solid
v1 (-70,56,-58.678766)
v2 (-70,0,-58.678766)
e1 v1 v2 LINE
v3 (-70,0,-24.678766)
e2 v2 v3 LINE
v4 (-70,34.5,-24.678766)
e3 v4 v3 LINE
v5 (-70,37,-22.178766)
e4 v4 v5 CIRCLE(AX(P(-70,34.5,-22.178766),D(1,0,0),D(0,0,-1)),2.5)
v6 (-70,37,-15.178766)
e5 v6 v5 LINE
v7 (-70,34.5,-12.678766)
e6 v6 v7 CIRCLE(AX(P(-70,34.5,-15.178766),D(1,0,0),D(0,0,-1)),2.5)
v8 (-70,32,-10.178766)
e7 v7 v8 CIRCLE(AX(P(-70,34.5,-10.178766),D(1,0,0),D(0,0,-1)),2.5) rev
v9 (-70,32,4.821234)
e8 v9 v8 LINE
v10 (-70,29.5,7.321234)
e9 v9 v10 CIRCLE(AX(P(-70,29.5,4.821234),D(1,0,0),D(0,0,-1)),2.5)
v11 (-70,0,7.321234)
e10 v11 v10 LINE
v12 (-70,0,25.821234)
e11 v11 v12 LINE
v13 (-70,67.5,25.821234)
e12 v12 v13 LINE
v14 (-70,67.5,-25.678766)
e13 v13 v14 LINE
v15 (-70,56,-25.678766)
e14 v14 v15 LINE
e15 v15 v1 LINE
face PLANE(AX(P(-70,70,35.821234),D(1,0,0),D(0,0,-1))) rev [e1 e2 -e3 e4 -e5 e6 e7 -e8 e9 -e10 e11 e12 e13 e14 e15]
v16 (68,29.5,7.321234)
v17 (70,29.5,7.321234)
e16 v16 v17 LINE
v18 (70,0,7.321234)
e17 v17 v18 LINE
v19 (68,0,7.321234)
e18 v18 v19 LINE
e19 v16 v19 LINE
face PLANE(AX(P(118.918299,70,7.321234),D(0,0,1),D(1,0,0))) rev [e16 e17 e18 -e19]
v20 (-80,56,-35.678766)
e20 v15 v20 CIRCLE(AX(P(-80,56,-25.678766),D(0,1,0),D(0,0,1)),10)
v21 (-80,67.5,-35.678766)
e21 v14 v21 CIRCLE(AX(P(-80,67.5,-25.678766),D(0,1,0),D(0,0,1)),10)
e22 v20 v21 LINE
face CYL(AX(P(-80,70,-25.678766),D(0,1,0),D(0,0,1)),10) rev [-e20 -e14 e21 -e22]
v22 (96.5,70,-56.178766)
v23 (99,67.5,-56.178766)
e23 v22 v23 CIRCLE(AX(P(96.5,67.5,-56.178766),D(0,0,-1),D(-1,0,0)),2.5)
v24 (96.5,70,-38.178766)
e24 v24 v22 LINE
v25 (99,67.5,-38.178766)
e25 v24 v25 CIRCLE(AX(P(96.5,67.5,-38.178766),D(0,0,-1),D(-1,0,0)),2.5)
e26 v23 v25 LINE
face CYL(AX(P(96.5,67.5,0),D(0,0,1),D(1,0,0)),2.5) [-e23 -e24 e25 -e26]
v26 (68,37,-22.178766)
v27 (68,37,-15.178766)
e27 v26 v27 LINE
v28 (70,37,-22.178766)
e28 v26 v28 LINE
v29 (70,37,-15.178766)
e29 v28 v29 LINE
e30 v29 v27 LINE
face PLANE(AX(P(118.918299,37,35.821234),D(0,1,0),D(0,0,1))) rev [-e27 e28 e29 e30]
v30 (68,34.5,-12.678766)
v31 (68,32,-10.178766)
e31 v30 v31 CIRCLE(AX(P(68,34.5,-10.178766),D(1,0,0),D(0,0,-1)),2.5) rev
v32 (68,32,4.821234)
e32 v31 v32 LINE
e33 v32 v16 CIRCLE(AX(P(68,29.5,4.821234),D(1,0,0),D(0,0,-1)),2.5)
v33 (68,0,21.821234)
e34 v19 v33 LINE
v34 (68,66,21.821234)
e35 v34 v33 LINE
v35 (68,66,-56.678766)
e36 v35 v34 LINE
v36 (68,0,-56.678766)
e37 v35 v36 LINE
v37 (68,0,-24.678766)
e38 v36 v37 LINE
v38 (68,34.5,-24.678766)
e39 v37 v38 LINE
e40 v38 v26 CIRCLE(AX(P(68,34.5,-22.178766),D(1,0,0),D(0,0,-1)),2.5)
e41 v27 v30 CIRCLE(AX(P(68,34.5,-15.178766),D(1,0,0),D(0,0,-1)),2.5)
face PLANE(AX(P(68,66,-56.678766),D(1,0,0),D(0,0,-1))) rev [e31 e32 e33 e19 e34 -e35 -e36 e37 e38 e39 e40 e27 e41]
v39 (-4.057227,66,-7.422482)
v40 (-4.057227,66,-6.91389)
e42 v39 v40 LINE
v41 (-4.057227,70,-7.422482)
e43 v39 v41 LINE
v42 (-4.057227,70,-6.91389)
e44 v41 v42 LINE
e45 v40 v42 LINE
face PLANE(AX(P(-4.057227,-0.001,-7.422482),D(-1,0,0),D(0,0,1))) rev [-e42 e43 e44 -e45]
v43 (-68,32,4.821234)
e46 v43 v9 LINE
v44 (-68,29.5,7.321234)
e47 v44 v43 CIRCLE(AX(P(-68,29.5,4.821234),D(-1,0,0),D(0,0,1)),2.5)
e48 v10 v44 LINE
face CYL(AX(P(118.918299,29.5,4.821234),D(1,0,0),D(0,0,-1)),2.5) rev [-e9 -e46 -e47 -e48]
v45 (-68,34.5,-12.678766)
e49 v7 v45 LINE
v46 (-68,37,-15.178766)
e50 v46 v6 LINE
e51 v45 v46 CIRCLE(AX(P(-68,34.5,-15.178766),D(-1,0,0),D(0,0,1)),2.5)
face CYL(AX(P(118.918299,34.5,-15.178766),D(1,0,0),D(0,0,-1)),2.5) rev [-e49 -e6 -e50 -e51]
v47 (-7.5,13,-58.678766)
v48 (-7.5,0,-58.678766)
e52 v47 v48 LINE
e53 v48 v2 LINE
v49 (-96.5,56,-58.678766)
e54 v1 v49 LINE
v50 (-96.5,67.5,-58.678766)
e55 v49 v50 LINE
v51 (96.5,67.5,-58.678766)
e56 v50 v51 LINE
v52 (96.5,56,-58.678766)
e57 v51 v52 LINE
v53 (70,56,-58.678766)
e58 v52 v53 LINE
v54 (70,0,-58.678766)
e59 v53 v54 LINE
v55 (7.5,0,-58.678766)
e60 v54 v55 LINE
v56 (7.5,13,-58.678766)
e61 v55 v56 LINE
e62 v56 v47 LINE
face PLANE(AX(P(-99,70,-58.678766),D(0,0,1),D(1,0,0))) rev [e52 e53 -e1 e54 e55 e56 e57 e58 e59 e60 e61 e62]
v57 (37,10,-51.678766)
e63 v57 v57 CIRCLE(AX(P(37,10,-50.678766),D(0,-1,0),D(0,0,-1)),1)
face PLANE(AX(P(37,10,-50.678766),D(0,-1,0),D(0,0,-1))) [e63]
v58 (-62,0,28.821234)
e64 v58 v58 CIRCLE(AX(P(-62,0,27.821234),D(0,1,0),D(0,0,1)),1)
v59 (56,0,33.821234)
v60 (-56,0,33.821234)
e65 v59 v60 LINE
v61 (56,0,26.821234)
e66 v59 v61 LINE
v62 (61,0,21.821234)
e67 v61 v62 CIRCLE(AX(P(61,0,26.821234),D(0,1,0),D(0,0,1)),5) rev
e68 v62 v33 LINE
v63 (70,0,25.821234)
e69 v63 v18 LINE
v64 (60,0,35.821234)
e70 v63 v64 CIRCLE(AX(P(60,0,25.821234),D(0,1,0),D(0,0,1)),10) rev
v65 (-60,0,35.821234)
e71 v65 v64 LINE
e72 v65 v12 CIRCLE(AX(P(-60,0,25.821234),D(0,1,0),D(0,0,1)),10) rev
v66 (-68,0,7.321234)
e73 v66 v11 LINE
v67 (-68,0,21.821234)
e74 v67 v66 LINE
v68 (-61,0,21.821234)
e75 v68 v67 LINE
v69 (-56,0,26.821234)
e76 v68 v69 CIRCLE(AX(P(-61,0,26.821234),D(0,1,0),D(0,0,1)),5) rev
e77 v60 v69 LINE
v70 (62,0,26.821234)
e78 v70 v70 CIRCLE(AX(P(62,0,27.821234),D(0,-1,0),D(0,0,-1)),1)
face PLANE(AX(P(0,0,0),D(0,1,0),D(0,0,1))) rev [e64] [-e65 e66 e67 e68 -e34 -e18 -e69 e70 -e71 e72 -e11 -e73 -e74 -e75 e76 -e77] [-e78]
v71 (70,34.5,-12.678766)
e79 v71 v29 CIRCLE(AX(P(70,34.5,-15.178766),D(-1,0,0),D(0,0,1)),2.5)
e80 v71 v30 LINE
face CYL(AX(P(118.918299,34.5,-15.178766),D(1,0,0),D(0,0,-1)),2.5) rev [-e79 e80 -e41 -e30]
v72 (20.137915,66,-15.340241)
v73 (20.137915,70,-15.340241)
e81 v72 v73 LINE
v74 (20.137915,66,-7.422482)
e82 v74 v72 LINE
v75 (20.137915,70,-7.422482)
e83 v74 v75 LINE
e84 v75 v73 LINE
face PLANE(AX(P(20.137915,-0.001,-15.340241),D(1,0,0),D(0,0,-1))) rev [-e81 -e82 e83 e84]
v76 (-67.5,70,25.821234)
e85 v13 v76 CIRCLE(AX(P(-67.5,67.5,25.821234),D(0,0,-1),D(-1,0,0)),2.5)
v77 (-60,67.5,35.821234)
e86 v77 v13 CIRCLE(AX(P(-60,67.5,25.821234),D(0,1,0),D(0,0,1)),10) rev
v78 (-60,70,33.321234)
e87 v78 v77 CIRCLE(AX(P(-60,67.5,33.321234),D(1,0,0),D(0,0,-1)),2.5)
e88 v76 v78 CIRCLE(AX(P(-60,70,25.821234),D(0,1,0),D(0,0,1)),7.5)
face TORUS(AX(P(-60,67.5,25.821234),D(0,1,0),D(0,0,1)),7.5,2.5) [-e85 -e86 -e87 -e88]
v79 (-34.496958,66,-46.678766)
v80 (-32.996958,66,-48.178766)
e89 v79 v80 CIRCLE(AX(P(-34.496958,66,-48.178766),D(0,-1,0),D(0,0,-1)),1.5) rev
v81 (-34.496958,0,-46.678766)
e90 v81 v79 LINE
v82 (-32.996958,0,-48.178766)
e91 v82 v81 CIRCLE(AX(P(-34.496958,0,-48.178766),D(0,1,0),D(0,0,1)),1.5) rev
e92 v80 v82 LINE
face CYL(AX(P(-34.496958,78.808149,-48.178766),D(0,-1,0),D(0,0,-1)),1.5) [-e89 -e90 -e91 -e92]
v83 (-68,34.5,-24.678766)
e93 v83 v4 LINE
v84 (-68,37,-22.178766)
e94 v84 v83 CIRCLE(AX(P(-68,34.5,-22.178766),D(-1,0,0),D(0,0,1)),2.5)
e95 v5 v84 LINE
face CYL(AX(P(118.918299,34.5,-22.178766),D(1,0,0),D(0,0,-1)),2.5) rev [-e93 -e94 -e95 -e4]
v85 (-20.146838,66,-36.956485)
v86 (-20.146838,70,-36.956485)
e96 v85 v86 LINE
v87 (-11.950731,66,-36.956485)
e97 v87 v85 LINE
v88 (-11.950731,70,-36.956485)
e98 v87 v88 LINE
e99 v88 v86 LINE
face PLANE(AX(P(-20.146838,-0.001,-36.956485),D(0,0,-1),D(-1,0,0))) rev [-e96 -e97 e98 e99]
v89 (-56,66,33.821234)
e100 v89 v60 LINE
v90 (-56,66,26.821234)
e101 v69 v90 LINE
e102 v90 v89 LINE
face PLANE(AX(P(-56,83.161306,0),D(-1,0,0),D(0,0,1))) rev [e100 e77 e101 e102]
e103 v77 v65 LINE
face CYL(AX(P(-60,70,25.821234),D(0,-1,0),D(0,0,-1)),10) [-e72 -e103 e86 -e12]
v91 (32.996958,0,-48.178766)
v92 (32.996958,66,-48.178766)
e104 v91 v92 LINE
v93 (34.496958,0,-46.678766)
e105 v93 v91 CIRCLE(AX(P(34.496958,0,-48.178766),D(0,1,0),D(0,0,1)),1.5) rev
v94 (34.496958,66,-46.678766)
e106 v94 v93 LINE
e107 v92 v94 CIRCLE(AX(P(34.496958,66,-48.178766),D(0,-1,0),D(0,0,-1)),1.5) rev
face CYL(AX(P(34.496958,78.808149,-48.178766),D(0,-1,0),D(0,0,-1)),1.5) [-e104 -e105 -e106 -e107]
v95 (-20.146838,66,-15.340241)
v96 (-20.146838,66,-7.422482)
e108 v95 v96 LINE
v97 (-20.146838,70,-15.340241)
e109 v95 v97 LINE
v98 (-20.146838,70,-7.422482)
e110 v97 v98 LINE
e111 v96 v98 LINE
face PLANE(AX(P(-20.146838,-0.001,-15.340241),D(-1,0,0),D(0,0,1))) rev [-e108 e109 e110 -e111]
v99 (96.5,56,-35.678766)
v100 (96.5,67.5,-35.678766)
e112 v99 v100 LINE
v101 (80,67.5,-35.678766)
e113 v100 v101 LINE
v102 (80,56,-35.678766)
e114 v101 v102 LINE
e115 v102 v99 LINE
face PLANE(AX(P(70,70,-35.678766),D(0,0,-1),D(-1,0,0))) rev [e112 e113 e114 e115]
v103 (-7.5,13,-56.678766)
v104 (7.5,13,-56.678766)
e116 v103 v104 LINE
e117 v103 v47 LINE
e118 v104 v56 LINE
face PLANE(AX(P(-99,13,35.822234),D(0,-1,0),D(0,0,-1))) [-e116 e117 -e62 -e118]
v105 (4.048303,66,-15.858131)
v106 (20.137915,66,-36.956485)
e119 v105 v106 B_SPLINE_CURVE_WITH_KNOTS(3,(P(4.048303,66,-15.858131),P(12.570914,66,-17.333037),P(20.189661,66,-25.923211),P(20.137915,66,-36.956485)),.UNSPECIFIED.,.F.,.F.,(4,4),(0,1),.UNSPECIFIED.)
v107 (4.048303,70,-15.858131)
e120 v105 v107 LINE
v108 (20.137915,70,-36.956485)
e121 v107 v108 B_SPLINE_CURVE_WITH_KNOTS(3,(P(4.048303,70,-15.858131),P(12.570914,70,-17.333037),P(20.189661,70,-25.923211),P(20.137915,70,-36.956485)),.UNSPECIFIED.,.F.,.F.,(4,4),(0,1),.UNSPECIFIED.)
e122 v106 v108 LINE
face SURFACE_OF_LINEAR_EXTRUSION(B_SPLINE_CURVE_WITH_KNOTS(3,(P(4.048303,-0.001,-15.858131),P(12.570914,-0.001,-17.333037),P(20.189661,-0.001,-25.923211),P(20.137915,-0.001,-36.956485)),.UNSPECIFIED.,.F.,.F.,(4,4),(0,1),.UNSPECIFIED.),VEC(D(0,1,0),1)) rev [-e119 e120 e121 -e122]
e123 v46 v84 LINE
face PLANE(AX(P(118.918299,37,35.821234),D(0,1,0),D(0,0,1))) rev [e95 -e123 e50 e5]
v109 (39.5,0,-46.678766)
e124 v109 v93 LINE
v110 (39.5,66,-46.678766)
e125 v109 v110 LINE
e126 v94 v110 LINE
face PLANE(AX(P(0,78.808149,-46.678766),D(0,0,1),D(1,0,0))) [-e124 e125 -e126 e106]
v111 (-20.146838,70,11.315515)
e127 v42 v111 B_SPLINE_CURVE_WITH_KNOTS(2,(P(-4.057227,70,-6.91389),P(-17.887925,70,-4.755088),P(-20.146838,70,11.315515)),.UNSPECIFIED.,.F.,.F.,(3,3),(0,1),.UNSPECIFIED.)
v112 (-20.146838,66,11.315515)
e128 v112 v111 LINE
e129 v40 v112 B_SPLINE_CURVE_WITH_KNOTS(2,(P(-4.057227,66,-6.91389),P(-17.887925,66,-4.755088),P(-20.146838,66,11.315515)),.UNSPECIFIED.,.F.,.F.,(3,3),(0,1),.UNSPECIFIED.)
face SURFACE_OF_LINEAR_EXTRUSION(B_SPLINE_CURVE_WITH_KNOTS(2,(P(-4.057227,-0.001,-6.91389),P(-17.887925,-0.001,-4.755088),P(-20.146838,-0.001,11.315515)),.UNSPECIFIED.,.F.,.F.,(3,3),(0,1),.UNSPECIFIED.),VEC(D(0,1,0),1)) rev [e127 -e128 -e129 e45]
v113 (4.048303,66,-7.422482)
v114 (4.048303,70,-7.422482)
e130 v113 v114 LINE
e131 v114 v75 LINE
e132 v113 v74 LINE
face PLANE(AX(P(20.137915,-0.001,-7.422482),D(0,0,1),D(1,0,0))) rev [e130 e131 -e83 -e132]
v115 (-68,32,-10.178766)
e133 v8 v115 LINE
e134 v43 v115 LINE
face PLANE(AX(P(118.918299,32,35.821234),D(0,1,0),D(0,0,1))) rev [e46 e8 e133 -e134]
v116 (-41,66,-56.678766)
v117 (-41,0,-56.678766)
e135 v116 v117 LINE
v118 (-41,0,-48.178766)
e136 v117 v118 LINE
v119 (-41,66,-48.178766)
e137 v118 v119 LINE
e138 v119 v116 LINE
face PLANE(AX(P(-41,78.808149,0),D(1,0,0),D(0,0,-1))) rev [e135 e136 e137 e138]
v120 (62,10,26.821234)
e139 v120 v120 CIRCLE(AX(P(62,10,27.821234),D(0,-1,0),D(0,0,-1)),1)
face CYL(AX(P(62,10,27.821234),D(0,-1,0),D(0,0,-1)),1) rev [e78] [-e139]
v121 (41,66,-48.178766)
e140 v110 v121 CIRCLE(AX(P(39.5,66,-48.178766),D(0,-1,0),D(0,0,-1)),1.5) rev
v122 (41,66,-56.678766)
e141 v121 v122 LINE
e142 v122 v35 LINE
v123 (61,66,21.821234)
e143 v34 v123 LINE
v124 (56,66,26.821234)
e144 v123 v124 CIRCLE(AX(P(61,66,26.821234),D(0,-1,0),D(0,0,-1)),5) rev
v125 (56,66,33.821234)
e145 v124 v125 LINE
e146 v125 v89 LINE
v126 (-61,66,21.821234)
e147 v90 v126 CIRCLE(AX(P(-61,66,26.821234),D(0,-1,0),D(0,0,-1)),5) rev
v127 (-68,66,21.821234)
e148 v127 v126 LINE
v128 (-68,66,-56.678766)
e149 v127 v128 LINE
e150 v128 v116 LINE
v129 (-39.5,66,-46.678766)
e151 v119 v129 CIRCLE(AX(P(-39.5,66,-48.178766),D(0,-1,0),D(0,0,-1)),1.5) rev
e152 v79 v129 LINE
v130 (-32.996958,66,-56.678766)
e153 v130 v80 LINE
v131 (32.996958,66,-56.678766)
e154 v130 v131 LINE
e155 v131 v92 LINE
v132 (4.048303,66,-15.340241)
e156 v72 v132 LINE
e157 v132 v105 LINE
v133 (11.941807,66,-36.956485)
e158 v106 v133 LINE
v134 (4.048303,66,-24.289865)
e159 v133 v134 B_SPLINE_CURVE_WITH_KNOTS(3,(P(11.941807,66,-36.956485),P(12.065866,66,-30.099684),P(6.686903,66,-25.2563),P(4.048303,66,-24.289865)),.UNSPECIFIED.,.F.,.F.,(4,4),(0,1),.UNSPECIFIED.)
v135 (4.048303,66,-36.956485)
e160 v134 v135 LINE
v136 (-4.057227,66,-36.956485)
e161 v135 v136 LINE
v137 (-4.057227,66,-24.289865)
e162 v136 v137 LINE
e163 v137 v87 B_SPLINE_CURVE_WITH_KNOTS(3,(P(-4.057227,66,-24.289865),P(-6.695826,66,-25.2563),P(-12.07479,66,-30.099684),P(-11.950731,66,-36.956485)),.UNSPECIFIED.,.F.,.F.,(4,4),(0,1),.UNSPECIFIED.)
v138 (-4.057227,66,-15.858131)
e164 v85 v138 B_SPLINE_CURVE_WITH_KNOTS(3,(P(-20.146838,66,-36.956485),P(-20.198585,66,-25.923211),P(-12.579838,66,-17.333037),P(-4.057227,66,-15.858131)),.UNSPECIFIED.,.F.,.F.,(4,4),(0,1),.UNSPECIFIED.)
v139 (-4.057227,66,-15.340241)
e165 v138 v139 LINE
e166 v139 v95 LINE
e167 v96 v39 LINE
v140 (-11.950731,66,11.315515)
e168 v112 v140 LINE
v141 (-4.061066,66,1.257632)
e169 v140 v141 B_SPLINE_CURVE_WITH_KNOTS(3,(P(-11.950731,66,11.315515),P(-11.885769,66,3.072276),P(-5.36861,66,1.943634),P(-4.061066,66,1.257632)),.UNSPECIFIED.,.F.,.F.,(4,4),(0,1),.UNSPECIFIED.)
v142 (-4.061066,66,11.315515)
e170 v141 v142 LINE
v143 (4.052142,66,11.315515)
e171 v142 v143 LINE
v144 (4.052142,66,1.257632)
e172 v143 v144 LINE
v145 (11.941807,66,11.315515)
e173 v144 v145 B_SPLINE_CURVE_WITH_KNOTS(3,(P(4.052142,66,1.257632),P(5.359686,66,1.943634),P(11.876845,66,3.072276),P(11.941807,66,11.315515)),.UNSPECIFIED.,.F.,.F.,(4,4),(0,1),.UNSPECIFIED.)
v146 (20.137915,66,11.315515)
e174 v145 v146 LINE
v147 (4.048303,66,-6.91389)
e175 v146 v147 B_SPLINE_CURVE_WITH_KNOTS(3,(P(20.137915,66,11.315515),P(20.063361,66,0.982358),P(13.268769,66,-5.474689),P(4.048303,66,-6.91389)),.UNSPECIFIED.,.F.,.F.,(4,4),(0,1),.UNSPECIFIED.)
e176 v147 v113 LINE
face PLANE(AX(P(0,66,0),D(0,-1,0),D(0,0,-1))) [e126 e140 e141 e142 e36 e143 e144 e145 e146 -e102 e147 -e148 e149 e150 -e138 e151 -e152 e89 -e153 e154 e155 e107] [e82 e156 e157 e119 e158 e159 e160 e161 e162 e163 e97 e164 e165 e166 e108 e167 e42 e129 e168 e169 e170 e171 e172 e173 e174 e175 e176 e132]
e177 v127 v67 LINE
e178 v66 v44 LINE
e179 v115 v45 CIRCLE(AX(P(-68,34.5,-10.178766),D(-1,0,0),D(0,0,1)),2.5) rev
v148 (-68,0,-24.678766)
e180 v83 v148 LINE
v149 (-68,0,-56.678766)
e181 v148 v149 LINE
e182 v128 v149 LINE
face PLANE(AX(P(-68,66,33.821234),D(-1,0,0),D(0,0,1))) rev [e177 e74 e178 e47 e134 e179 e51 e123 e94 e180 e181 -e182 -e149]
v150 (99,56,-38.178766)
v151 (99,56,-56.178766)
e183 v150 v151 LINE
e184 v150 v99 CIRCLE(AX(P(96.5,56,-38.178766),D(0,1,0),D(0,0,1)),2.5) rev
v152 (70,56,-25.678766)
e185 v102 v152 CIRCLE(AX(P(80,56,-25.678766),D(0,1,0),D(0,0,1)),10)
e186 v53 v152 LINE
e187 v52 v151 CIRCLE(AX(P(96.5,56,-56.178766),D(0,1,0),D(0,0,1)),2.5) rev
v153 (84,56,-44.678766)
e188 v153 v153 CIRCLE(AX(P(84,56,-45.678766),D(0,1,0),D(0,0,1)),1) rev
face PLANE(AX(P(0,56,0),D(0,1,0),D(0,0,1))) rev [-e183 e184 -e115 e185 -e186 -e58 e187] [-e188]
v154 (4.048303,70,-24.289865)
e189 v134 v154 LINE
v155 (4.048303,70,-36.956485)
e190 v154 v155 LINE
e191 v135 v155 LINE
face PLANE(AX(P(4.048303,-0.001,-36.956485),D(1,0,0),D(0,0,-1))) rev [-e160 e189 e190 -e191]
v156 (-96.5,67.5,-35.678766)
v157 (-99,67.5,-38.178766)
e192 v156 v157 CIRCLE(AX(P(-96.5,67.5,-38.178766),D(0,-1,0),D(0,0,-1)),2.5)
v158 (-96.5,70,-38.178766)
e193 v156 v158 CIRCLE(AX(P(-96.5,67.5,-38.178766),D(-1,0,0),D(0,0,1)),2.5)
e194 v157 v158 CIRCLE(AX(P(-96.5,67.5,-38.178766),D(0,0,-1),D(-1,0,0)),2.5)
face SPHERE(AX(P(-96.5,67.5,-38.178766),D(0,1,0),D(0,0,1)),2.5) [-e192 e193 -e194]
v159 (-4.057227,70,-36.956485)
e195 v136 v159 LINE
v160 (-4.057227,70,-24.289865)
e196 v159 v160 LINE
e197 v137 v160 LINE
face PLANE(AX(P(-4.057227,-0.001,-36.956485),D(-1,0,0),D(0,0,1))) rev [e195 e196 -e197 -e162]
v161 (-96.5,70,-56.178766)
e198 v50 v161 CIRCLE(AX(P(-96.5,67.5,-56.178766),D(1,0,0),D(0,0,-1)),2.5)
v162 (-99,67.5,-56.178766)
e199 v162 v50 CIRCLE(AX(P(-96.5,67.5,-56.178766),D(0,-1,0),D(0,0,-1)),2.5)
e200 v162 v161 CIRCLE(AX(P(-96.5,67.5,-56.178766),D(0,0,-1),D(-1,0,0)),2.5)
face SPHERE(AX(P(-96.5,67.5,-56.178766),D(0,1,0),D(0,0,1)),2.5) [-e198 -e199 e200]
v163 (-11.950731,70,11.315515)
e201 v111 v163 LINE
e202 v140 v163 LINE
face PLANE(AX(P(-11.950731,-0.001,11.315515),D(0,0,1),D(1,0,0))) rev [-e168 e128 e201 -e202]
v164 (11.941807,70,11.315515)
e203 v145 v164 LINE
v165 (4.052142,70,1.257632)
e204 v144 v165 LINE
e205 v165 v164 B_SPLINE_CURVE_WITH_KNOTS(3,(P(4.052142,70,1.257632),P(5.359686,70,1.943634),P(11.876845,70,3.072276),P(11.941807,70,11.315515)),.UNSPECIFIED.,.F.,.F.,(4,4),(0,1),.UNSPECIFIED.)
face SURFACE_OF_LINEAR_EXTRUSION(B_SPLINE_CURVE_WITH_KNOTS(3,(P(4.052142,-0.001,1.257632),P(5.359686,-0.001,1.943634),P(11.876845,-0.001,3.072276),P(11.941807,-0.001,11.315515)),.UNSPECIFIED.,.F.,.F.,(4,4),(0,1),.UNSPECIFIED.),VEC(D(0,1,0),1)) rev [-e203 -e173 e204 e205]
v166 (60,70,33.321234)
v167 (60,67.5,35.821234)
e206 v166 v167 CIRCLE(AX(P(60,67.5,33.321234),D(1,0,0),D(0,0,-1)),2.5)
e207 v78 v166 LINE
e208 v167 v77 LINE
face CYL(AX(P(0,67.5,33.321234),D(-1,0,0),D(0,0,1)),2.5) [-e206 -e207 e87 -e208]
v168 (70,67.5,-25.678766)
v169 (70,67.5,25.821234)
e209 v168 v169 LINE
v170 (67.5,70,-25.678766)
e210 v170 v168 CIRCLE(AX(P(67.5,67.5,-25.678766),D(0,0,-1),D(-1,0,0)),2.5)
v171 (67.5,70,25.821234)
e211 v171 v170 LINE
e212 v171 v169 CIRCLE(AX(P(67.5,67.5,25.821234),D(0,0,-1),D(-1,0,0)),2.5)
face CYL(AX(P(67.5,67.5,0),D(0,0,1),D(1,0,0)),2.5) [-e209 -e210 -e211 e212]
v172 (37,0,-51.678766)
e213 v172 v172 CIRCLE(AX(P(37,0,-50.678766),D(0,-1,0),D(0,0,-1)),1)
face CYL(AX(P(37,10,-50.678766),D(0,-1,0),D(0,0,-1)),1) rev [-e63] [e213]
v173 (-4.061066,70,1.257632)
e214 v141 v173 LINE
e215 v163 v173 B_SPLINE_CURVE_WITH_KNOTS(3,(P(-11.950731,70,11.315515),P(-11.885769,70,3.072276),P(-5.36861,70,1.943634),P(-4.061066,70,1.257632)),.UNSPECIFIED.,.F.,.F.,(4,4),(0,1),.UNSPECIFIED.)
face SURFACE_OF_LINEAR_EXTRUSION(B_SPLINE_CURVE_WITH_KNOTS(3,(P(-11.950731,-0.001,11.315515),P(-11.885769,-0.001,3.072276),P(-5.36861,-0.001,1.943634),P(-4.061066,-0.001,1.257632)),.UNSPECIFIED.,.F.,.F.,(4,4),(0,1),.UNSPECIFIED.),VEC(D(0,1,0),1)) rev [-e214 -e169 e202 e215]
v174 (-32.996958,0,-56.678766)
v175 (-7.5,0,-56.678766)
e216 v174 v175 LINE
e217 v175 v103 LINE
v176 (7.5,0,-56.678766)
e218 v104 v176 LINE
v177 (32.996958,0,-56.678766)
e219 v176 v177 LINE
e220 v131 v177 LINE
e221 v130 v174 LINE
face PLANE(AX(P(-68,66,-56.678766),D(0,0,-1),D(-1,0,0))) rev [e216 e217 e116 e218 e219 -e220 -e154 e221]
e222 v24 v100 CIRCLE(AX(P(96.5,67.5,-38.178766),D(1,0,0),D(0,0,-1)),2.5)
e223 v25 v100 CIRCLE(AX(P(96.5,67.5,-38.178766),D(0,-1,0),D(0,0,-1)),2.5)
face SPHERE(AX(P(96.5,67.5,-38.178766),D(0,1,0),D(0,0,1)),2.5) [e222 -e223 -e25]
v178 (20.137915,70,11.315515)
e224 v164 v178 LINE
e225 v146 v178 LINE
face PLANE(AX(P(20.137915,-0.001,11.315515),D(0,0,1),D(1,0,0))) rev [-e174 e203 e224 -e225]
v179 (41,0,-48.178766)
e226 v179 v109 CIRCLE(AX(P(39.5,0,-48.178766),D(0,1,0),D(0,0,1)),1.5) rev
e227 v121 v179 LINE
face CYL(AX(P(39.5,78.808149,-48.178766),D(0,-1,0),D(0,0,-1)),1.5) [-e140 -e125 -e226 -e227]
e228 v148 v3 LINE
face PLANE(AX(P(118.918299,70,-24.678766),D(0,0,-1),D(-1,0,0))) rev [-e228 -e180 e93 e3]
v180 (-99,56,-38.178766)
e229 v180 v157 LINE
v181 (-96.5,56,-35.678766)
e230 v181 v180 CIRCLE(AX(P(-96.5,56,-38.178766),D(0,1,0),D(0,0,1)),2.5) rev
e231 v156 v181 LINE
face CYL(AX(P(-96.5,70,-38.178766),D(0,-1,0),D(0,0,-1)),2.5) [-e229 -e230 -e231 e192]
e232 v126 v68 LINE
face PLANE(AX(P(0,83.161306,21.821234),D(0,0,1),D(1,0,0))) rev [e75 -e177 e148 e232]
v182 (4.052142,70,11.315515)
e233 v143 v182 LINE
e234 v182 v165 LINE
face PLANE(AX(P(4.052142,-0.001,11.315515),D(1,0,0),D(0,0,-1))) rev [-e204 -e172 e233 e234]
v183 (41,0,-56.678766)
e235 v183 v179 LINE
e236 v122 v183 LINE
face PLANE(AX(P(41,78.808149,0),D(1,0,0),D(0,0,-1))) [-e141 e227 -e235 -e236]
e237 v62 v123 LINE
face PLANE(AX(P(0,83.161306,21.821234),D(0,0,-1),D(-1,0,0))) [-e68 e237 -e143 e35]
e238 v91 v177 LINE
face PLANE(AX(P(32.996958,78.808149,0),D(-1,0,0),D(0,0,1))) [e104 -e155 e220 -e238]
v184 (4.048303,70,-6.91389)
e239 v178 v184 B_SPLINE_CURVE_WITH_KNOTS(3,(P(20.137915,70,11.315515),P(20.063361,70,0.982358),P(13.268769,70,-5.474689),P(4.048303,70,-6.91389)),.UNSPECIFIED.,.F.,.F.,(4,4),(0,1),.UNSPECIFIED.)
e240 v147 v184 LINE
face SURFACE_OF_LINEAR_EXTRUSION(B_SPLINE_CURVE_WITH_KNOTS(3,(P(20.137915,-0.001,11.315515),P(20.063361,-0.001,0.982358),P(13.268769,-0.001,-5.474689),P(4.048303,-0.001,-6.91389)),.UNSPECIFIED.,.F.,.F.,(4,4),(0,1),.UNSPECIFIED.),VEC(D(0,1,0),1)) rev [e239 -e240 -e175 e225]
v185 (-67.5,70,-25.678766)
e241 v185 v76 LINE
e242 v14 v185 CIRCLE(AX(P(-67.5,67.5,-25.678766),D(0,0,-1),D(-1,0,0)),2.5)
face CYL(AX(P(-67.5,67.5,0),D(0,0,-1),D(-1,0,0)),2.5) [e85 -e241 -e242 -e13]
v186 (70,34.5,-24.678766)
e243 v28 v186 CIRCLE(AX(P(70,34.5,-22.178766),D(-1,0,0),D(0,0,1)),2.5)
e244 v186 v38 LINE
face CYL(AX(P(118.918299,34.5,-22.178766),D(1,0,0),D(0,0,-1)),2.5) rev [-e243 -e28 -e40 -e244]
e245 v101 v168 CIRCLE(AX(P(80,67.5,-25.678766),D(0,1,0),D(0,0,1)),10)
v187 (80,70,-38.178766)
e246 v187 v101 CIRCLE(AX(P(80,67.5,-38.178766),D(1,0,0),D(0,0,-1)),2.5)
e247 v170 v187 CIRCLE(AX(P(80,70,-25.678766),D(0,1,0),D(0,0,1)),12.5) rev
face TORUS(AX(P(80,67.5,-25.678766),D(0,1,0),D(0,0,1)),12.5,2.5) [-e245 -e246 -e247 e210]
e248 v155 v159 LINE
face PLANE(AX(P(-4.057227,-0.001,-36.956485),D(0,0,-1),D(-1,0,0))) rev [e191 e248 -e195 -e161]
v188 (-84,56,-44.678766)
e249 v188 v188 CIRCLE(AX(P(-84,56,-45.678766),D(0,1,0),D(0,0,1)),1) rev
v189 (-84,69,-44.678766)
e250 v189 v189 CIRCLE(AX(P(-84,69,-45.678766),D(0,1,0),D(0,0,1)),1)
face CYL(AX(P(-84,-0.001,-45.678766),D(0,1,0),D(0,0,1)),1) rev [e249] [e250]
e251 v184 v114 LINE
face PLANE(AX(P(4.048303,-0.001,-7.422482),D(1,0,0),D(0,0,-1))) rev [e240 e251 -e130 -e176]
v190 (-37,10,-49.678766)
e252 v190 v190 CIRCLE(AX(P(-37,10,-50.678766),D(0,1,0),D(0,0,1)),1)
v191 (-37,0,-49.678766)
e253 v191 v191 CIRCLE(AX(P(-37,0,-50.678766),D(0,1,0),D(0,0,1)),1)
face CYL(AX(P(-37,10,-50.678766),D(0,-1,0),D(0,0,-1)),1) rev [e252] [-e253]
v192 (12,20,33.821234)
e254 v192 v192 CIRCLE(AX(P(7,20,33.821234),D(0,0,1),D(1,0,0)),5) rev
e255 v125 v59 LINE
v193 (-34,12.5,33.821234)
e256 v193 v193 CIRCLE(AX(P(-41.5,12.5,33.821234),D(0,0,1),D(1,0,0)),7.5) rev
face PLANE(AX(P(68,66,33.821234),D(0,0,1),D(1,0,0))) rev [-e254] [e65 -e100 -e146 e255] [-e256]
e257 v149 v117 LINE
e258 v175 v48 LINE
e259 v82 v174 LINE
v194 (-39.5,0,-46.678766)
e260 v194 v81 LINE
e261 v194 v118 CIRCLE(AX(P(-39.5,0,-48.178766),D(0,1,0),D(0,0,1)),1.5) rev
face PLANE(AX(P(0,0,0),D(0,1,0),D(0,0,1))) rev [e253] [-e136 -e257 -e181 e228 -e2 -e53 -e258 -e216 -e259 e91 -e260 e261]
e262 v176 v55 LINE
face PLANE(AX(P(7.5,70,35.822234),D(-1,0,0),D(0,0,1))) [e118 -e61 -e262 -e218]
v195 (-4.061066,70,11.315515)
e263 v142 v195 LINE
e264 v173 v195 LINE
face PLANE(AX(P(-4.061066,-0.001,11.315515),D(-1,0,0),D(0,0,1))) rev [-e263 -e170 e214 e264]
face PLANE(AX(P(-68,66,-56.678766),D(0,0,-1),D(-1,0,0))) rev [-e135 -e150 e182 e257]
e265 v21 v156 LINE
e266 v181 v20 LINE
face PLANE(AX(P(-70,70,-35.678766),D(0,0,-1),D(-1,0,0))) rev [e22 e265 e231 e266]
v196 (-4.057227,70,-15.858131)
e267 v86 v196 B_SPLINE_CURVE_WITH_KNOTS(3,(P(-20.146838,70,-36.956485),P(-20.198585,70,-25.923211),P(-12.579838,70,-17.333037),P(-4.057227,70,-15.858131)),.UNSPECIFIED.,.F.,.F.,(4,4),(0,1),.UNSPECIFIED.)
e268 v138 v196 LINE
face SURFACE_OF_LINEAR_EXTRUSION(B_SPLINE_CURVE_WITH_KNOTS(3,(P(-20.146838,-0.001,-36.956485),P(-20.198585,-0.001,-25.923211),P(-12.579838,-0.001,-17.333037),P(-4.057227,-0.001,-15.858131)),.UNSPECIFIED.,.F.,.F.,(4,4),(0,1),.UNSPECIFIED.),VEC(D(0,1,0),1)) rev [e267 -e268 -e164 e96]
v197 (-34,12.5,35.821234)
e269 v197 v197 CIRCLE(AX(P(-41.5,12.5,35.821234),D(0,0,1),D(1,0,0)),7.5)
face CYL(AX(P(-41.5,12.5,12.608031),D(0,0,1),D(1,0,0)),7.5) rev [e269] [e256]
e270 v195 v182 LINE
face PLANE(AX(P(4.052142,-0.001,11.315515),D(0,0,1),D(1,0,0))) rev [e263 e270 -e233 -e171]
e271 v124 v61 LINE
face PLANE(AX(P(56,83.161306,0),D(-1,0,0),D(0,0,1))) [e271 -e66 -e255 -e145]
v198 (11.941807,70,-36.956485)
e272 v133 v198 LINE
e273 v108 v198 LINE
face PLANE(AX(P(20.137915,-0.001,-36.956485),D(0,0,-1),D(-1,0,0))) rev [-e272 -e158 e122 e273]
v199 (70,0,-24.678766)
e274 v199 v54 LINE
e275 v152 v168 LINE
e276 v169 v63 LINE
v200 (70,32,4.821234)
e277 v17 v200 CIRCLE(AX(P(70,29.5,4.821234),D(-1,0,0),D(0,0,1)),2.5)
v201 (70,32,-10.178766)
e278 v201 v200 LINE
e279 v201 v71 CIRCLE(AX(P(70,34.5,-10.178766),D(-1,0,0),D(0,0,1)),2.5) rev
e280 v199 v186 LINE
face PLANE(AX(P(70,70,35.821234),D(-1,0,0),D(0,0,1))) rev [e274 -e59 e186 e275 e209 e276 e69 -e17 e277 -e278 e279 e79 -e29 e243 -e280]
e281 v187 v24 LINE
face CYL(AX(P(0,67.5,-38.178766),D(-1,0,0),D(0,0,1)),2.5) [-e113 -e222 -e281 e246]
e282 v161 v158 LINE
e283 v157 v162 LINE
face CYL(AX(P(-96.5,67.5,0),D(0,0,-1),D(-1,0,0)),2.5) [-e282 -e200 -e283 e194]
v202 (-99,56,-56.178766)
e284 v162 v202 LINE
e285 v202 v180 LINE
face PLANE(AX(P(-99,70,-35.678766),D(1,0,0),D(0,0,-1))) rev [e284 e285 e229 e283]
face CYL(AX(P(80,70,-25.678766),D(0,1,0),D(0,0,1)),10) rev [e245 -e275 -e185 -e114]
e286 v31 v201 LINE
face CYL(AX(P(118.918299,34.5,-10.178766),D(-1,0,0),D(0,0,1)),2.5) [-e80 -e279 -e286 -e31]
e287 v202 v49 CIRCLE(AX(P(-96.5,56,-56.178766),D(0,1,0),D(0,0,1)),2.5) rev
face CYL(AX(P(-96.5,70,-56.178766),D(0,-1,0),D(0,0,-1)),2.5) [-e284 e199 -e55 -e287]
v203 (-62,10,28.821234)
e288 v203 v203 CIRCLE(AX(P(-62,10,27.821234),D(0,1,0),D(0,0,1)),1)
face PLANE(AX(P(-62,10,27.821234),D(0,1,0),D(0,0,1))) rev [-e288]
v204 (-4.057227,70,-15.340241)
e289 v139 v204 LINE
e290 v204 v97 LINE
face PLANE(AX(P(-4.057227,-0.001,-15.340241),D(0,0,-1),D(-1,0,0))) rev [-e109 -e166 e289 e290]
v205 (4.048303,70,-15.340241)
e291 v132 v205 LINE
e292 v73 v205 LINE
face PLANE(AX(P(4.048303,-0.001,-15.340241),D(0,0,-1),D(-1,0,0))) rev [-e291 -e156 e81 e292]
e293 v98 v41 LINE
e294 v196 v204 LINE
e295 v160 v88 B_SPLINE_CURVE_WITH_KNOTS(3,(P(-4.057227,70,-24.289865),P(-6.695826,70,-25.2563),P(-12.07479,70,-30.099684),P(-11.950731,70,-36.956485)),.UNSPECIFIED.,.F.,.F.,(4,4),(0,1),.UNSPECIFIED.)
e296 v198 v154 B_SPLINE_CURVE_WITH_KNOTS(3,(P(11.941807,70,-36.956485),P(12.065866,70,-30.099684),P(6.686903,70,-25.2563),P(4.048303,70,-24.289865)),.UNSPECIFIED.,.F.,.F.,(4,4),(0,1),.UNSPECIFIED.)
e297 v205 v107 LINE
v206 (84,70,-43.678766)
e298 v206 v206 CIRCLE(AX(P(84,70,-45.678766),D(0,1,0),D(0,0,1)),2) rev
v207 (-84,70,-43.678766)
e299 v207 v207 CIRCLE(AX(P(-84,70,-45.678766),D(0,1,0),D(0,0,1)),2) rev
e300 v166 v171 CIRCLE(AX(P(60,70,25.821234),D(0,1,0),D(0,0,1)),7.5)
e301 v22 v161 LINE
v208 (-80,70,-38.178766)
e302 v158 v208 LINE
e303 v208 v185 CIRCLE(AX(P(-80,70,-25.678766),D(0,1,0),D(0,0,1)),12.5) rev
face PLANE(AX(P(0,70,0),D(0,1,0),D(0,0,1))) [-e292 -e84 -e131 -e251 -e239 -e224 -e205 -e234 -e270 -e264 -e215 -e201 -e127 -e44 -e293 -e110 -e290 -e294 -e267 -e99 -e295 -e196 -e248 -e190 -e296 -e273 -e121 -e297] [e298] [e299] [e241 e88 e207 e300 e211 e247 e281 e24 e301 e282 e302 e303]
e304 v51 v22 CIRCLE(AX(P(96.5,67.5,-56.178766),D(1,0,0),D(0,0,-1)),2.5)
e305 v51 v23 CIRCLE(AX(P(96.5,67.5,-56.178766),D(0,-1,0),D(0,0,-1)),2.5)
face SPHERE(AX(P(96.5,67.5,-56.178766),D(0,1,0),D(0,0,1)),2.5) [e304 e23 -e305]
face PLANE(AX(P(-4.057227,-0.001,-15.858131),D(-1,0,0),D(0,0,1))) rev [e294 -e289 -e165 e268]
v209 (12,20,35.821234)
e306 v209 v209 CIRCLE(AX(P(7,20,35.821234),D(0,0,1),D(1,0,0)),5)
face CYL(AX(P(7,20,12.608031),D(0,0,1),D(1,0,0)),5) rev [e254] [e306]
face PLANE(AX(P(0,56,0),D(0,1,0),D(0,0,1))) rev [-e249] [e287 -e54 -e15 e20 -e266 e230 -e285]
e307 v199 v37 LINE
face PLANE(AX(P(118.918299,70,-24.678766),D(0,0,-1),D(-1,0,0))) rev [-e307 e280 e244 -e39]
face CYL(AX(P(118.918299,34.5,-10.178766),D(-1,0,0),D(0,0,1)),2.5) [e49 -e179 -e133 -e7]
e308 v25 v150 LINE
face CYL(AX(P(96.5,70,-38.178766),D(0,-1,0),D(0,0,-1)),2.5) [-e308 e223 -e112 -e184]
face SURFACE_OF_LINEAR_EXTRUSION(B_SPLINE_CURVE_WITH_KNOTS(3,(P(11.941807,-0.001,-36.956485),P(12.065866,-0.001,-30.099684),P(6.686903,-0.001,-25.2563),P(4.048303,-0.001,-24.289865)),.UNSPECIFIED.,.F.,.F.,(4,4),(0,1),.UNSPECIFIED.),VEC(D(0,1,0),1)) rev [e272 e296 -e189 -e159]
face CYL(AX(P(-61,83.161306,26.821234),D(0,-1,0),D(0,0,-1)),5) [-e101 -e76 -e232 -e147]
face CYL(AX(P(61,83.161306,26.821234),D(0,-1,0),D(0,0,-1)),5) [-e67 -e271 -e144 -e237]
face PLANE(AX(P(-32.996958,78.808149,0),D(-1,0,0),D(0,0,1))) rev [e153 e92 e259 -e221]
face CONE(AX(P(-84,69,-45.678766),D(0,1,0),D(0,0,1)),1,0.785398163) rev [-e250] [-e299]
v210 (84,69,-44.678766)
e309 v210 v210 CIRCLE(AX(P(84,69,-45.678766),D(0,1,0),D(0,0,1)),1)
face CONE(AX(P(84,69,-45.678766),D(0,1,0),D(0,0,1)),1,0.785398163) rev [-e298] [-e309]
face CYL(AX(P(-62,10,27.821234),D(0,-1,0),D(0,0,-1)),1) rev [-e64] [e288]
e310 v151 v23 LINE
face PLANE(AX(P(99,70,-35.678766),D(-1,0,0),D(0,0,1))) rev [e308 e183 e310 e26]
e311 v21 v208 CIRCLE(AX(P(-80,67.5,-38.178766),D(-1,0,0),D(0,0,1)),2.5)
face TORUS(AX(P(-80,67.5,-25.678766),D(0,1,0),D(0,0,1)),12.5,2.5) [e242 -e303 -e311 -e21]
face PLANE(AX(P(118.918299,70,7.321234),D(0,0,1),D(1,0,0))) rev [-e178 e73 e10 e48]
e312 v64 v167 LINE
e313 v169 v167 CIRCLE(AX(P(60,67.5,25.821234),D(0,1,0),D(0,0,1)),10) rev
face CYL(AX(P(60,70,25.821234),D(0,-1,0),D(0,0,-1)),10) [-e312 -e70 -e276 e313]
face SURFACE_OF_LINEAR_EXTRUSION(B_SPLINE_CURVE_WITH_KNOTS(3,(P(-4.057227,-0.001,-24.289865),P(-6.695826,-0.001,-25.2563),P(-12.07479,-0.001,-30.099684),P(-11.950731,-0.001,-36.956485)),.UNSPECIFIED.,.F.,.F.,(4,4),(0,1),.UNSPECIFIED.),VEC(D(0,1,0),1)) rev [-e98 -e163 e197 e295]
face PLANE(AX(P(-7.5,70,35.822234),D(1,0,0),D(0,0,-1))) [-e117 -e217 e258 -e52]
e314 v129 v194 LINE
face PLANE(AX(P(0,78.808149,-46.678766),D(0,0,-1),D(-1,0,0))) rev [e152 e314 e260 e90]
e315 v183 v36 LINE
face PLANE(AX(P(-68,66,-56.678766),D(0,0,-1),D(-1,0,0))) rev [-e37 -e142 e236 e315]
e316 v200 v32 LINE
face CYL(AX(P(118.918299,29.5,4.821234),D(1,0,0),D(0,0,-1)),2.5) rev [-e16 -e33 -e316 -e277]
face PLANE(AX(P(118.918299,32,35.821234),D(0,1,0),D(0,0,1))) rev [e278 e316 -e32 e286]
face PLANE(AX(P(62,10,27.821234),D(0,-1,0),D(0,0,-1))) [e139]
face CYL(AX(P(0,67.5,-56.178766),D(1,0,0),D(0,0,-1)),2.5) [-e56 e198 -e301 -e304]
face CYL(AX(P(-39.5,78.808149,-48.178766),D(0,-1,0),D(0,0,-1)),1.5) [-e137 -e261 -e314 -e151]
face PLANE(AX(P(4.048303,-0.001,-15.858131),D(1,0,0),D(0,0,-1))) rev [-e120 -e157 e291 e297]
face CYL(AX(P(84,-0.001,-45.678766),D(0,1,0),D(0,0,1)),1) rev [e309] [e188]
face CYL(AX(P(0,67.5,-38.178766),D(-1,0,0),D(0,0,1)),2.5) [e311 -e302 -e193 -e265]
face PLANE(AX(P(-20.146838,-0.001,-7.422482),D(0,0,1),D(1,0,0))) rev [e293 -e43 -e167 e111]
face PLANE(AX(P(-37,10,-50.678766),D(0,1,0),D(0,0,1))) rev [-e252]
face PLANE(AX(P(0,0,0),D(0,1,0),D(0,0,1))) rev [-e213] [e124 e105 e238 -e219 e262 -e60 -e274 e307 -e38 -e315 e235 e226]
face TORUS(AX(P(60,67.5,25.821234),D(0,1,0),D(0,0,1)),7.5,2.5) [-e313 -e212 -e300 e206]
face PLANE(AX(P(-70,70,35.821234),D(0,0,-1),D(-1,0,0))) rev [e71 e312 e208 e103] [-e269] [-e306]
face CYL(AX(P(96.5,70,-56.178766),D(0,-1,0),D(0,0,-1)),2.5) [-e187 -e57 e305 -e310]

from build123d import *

# Parameters (mm, degrees)
SALIENTE_EXTRUIR1_DEPTH = 70
CORTAR_EXTRUIR1_START   = -70
CROQUIS2_W              = 29
CROQUIS2_H              = 23
CORTAR_EXTRUIR1_DEPTH   = 56
CROQUIS3_W              = 136
CROQUIS3_H              = 90.5
CORTAR_EXTRUIR2_DEPTH   = 66
REDONDEO5_R             = 10
REDONDEO13_R            = 2.5
REDONDEO14_R            = 10
REDONDEO15_R            = 10
CROQUIS7_W              = 15
CROQUIS7_H              = 13
CORTAR_EXTRUIR4_DEPTH   = 2
CORTAR_EXTRUIR5_DEPTH   = 140
REDONDEO16_R            = 2.5
REDONDEO17_R            = 2.5
CROQUIS9_R              = 7.5
CROQUIS9_R_2            = 5
CORTAR_EXTRUIR6_DEPTH   = 2
CROQUIS10_R             = 1
SALIENTE_EXTRUIR8_DEPTH = 66
CROQUIS10_4_R           = 1
CORTAR_EXTRUIR7_DEPTH   = 10
REDONDEO18_R            = 5
CROQUIS12_W             = 8.003042052
CROQUIS12_H             = 10
CROQUIS12_R             = 1
SALIENTE_EXTRUIR9_DEPTH = 66
CROQUIS12_3_R           = 1
CORTAR_EXTRUIR8_DEPTH   = 10
REDONDEO19_R            = 1.5
CORTAR_EXTRUIR9_REACH   = 136.7
CROQUIS13_R             = 1
REDONDEO20_R            = 2.5
CHAFL_N1_SIZE           = 1
CORTAR_EXTRUIR10_REACH  = 136.7


with BuildPart() as part:
    # Croquis1 → Saliente-Extruir1 (new body)
    with BuildSketch(Plane(origin=(0, 0, 0), x_dir=(1, 0, 0), z_dir=(0, 1, 0))):
        Polygon((-70, -35.821234201), (70, -35.821234201), (70, 35.678765799), (99, 35.678765799), (99, 58.678765799), (-99, 58.678765799), (-99, 35.678765799), (-70, 35.678765799), align=None)
    extrude(amount=SALIENTE_EXTRUIR1_DEPTH)

    # Croquis2 → Cortar-Extruir1 (cut)
    with BuildSketch(Plane(origin=(0, 70, 0), x_dir=(1, 0, 0), z_dir=(0, 1, 0)).offset(CORTAR_EXTRUIR1_START)):
        with Locations((-84.5, 47.178765799)):
            Rectangle(CROQUIS2_W, CROQUIS2_H)
        with Locations((84.5, 47.178765799)):
            Rectangle(CROQUIS2_W, CROQUIS2_H)
    extrude(amount=CORTAR_EXTRUIR1_DEPTH, mode=Mode.SUBTRACT)

    # Croquis3 → Cortar-Extruir2 (cut)
    with BuildSketch(Plane.XZ):
        with Locations((0, -11.428765799)):
            Rectangle(CROQUIS3_W, CROQUIS3_H)
    extrude(amount=-CORTAR_EXTRUIR2_DEPTH, mode=Mode.SUBTRACT)

    # Redondeo5
    redondeo5_edges = [part.edges().sort_by_distance(p)[0] for p in [
        (-70, 63, -35.678765799),
        (70, 63, -35.678765799),
    ]]
    fillet(redondeo5_edges, radius=REDONDEO5_R)

    # Redondeo13
    redondeo13_edges = [part.edges().sort_by_distance(p)[0] for p in [
        (-99, 63, -35.678765799),
        (-99, 63, -58.678765799),
        (99, 63, -58.678765799),
        (99, 63, -35.678765799),
    ]]
    fillet(redondeo13_edges, radius=REDONDEO13_R)

    # Redondeo14
    redondeo14_edges = [part.edges().sort_by_distance(p)[0] for p in [
        (-68, 33, 33.821234201),
        (68, 33, 33.821234201),
    ]]
    fillet(redondeo14_edges, radius=REDONDEO14_R)

    # Redondeo15
    redondeo15_edges = [part.edges().sort_by_distance(p)[0] for p in [
        (70, 35, 35.821234201),
        (-70, 35, 35.821234201),
    ]]
    fillet(redondeo15_edges, radius=REDONDEO15_R)

    # Croquis7 → Cortar-Extruir4 (cut)
    with BuildSketch(Plane(origin=(0, 0, -58.678765799), x_dir=(-1, 0, 0), z_dir=(0, 0, -1))):
        with Locations((0, 6.5)):
            Rectangle(CROQUIS7_W, CROQUIS7_H)
    extrude(amount=-CORTAR_EXTRUIR4_DEPTH, mode=Mode.SUBTRACT)

    # Croquis8 → Cortar-Extruir5 (cut)
    with BuildSketch(Plane.ZY.offset(70)):
        Polygon((-24.678765799, 0), (-24.678765799, 32), (-24.678765799, 37), (-12.678765799, 37), (-12.678765799, 32), (7.321234201, 32), (7.321234201, 0), align=None)
    extrude(amount=-CORTAR_EXTRUIR5_DEPTH, mode=Mode.SUBTRACT)

    # Redondeo16
    redondeo16_edges = [part.edges().sort_by_distance(p)[0] for p in [
        (-69, 32, -12.678765799),
        (-69, 32, 7.321234201),
        (-69, 37, -24.678765799),
        (-69, 37, -12.678765799),
    ]]
    fillet(redondeo16_edges, radius=REDONDEO16_R - 0.0001)  # a hair under: the kernel refuses the full size

    # Redondeo17
    redondeo17_edges = [part.edges().sort_by_distance(p)[0] for p in [
        (69, 37, -24.678765799),
        (69, 37, -12.678765799),
        (69, 32, -12.678765799),
        (69, 32, 7.321234201),
    ]]
    fillet(redondeo17_edges, radius=REDONDEO17_R - 0.0001)  # a hair under: the kernel refuses the full size

    # Croquis9 → Cortar-Extruir6 (cut)
    with BuildSketch(Plane.XY.offset(35.821234201)):
        with Locations((-41.5, 12.5)):
            Circle(CROQUIS9_R)
        with Locations((7, 20)):
            Circle(CROQUIS9_R_2)
    extrude(amount=-CORTAR_EXTRUIR6_DEPTH, mode=Mode.SUBTRACT)


with BuildPart() as saliente_extruir8_tool:
    # Croquis10 → Saliente-Extruir8 (new body)
    # profile 1 of 4: a face of its own
    with BuildSketch(Plane(origin=(0, 0, 0), x_dir=(1, 0, 0), z_dir=(0, 1, 0))):
        with BuildLine():
            ThreePointArc((-56, -33.821234201), (-65.071066479, -30.89230068), (-68, -21.821234201))
            Line((-68, -21.821234201), (-56, -21.821234201))
            Line((-56, -21.821234201), (-56, -33.821234201))
        make_face()
        with Locations((-62, -27.821234201)):
            Circle(CROQUIS10_R, mode=Mode.SUBTRACT)
    # profile 2 of 4: a face of its own
    with BuildSketch(Plane(origin=(0, 0, 0), x_dir=(1, 0, 0), z_dir=(0, 1, 0))):
        with Locations((-62, -27.821234201)):
            Circle(CROQUIS10_R)
    # profile 3 of 4: a face of its own
    with BuildSketch(Plane(origin=(0, 0, 0), x_dir=(1, 0, 0), z_dir=(0, 1, 0))):
        with BuildLine():
            Line((56, -33.821234201), (56, -21.821234201))
            Line((56, -21.821234201), (68, -21.821234201))
            ThreePointArc((68, -21.821234201), (65.071066479, -30.89230068), (56, -33.821234201))
        make_face()
        with Locations((62, -27.821234201)):
            Circle(CROQUIS10_R, mode=Mode.SUBTRACT)
    # profile 4 of 4: a face of its own
    with BuildSketch(Plane(origin=(0, 0, 0), x_dir=(1, 0, 0), z_dir=(0, 1, 0))):
        with Locations((62, -27.821234201)):
            Circle(CROQUIS10_R)
    extrude(amount=SALIENTE_EXTRUIR8_DEPTH)


with BuildPart() as part_1:
    add(part.part)


with BuildPart() as part_2:
    # Saliente-Extruir8: joined with saliente_extruir8_tool
    add(part_1.part.fuse(saliente_extruir8_tool.part, tol=0.00001))

    # Croquis10<4> → Cortar-Extruir7 (cut)
    with BuildSketch(Plane(origin=(0, 0, 0), x_dir=(1, 0, 0), z_dir=(0, 1, 0))):
        with Locations(Location((-62, -27.821234201, 0), (0, 0, 270))):
            Circle(CROQUIS10_4_R)
        with Locations(Location((62, -27.821234201, 0), (0, 0, 90))):
            Circle(CROQUIS10_4_R)
    extrude(amount=CORTAR_EXTRUIR7_DEPTH, mode=Mode.SUBTRACT)

    # Redondeo18
    redondeo18_edges = [part_2.edges().sort_by_distance(p)[0] for p in [
        (-56, 33, 21.821234201),
        (56, 33, 21.821234201),
    ]]
    fillet(redondeo18_edges, radius=REDONDEO18_R)

    # Croquis12 → Saliente-Extruir9 (add)
    # profile 1 of 4: a face of its own
    with BuildSketch(Plane(origin=(0, 0, 0), x_dir=(1, 0, 0), z_dir=(0, 1, 0))):
        with Locations((-36.998478974, 51.678765799)):
            Rectangle(CROQUIS12_W, CROQUIS12_H)
        with Locations((-37, 50.678765799)):
            Circle(CROQUIS12_R, mode=Mode.SUBTRACT)
    # profile 2 of 4: a face of its own
    with BuildSketch(Plane(origin=(0, 0, 0), x_dir=(1, 0, 0), z_dir=(0, 1, 0))):
        with Locations((-37, 50.678765799)):
            Circle(CROQUIS12_R)
    # profile 3 of 4: a face of its own
    with BuildSketch(Plane(origin=(0, 0, 0), x_dir=(1, 0, 0), z_dir=(0, 1, 0))):
        with Locations((36.998478974, 51.678765799)):
            Rectangle(CROQUIS12_W, CROQUIS12_H)
        with Locations((37, 50.678765799)):
            Circle(CROQUIS12_R, mode=Mode.SUBTRACT)
    # profile 4 of 4: a face of its own
    with BuildSketch(Plane(origin=(0, 0, 0), x_dir=(1, 0, 0), z_dir=(0, 1, 0))):
        with Locations((37, 50.678765799)):
            Circle(CROQUIS12_R)
    extrude(amount=SALIENTE_EXTRUIR9_DEPTH)

    # Croquis12<3> → Cortar-Extruir8 (cut)
    with BuildSketch(Plane(origin=(0, 0, 0), x_dir=(1, 0, 0), z_dir=(0, 1, 0))):
        with Locations(Location((-37, 50.678765799, 0), (0, 0, 270))):
            Circle(CROQUIS12_3_R)
        with Locations(Location((37, 50.678765799, 0), (0, 0, 90))):
            Circle(CROQUIS12_3_R)
    extrude(amount=CORTAR_EXTRUIR8_DEPTH, mode=Mode.SUBTRACT)

    # Redondeo19
    redondeo19_edges = [part_2.edges().sort_by_distance(p)[0] for p in [
        (-41, 33, -46.678765799),
        (-32.996957948, 33, -46.678765799),
        (41, 33, -46.678765799),
        (32.996957948, 33, -46.678765799),
    ]]
    fillet(redondeo19_edges, radius=REDONDEO19_R)

    # Croquis13 → Cortar-Extruir9 (cut, up to next)
    with BuildSketch(Plane(origin=(0, 70, 0), x_dir=(1, 0, 0), z_dir=(0, 1, 0)), mode=Mode.PRIVATE) as cortar_extruir9_sk1:
        with Locations(Location((-84, 45.678765799, 0), (0, 0, 270))):
            Circle(CROQUIS13_R)
    cortar_extruir9_tool1 = extrude(cortar_extruir9_sk1.sketch, amount=-CORTAR_EXTRUIR9_REACH, mode=Mode.PRIVATE) & part_2.part
    # Croquis13 → Cortar-Extruir9 (cut, up to next)
    with BuildSketch(Plane(origin=(0, 70, 0), x_dir=(1, 0, 0), z_dir=(0, 1, 0)), mode=Mode.PRIVATE) as cortar_extruir9_sk2:
        with Locations(Location((84, 45.678765799, 0), (0, 0, 270))):
            Circle(CROQUIS13_R)
    cortar_extruir9_tool2 = extrude(cortar_extruir9_sk2.sketch, amount=-CORTAR_EXTRUIR9_REACH, mode=Mode.PRIVATE) & part_2.part
    add(cortar_extruir9_tool1.solids().sort_by_distance((-84, 70, -45.678766))[0], mode=Mode.SUBTRACT)
    add(cortar_extruir9_tool2.solids().sort_by_distance((84, 70, -45.678766))[0], mode=Mode.SUBTRACT)

    # Redondeo20
    redondeo20_edges = [part_2.edges().sort_by_distance(p)[0] for p in [
        (70, 70, 0.071234201),
        (0, 70, 35.821234201),
        (-67.071067812, 70, 32.892302013),
        (67.071067812, 70, 32.892302013),
        (88.25, 70, -35.678765799),
        (-70, 70, 0.071234201),
        (72.928932188, 70, -32.749833611),
        (-72.928932188, 70, -32.749833611),
        (99, 70, -47.178765799),
        (-88.25, 70, -35.678765799),
        (0, 70, -58.678765799),
        (-99, 70, -47.178765799),
        (-98.267766953, 70, -36.410998846),
        (-98.267766953, 70, -57.946532752),
        (98.267766953, 70, -57.946532752),
        (98.267766953, 70, -36.410998846),
    ]]
    fillet(redondeo20_edges, radius=REDONDEO20_R)

    # Chaflán1
    chafl_n1_edges = [part_2.edges().sort_by_distance(p)[0] for p in [
        (-84, 70, -46.678765799),
        (84, 70, -46.678765799),
    ]]
    chamfer(chafl_n1_edges, length=CHAFL_N1_SIZE)

    # Croquis14 → Cortar-Extruir10 (cut, up to next)
    with BuildSketch(Plane(origin=(0, 70, 0), x_dir=(1, 0, 0), z_dir=(0, 1, 0)), mode=Mode.PRIVATE) as cortar_extruir10_sk1:
        with BuildLine():
            Line((-20.146838321, 36.956484824), (-11.95073101, 36.956484824))
            add(Edge.make_bspline(
                [(-4.057227177, 24.289864733), (-6.695826358, 25.256300103), (-12.074790019, 30.099684352), (-11.95073101, 36.956484824)],
                knots=[0, 0, 0, 0, 1, 1, 1, 1], degree=3))
            Line((-4.057227177, 24.289864733), (-4.057227177, 36.956484824))
            Line((-4.057227177, 36.956484824), (-0.004461878, 36.956484824))
            Line((-0.004461878, 36.956484824), (4.048303421, 36.956484824))
            Line((4.048303421, 36.956484824), (4.048303421, 24.289864733))
            add(Edge.make_bspline(
                [(4.048303421, 24.289864733), (6.686902602, 25.256300103), (12.065866263, 30.099684352), (11.941807254, 36.956484824)],
                knots=[0, 0, 0, 0, 1, 1, 1, 1], degree=3))
            Line((11.941807254, 36.956484824), (20.137914565, 36.956484824))
            add(Edge.make_bspline(
                [(20.137914565, 36.956484824), (20.18966101, 25.923210578), (12.570913778, 17.333037065), (4.048303421, 15.858130647)],
                knots=[0, 0, 0, 0, 1, 1, 1, 1], degree=3))
            Line((4.048303421, 15.858130647), (4.048303421, 15.340241278))
            Line((4.048303421, 15.340241278), (20.137914565, 15.340241278))
            Line((20.137914565, 15.340241278), (20.137914565, 7.422481759))
            Line((20.137914565, 7.422481759), (4.048303421, 7.422481759))
            Line((4.048303421, 7.422481759), (4.048303421, 6.913890274))
            add(Edge.make_bspline(
                [(4.048303421, 6.913890274), (13.268768878, 5.474688597), (20.063360811, -0.98235836), (20.137914565, -11.315515176)],
                knots=[0, 0, 0, 0, 1, 1, 1, 1], degree=3))
            Line((20.137914565, -11.315515176), (12.224292823, -11.315515176))
            Line((12.224292823, -11.315515176), (11.941807254, -11.315515176))
            add(Edge.make_bspline(
                [(4.05214205, -1.257632017), (5.359686174, -1.943634241), (11.876845008, -3.072276016), (11.941807254, -11.315515176)],
                knots=[0, 0, 0, 0, 1, 1, 1, 1], degree=3))
            Line((4.05214205, -1.257632017), (4.05214205, -11.315515176))
            Line((4.05214205, -11.315515176), (-4.061065806, -11.315515176))
            Line((-4.061065806, -11.315515176), (-4.061065806, -1.257632017))
            add(Edge.make_bspline(
                [(-4.061065806, -1.257632017), (-5.36860993, -1.943634241), (-11.885768764, -3.072276016), (-11.95073101, -11.315515176)],
                knots=[0, 0, 0, 0, 1, 1, 1, 1], degree=3))
            Line((-11.95073101, -11.315515176), (-12.233216579, -11.315515176))
            Line((-12.233216579, -11.315515176), (-20.146838321, -11.315515176))
            add(Edge.make_bspline(
                [(-4.057227177, 6.913890274), (-17.887925363, 4.755087759), (-20.146838321, -11.315515176)],
                knots=[0, 0, 0, 1, 1, 1], degree=2))
            Line((-4.057227177, 6.913890274), (-4.057227177, 7.422481759))
            Line((-4.057227177, 7.422481759), (-20.146838321, 7.422481759))
            Line((-20.146838321, 7.422481759), (-20.146838321, 15.340241278))
            Line((-20.146838321, 15.340241278), (-4.057227177, 15.340241278))
            Line((-4.057227177, 15.340241278), (-4.057227177, 15.858130647))
            add(Edge.make_bspline(
                [(-20.146838321, 36.956484824), (-20.198584766, 25.923210578), (-12.579837534, 17.333037065), (-4.057227177, 15.858130647)],
                knots=[0, 0, 0, 0, 1, 1, 1, 1], degree=3))
        make_face()
    cortar_extruir10_tool1 = extrude(cortar_extruir10_sk1.sketch, amount=-CORTAR_EXTRUIR10_REACH, mode=Mode.PRIVATE) & part_2.part
    add(cortar_extruir10_tool1.solids().sort_by_distance((0.076213, 70, -12.699632))[0], mode=Mode.SUBTRACT)


solid = part_2.part
